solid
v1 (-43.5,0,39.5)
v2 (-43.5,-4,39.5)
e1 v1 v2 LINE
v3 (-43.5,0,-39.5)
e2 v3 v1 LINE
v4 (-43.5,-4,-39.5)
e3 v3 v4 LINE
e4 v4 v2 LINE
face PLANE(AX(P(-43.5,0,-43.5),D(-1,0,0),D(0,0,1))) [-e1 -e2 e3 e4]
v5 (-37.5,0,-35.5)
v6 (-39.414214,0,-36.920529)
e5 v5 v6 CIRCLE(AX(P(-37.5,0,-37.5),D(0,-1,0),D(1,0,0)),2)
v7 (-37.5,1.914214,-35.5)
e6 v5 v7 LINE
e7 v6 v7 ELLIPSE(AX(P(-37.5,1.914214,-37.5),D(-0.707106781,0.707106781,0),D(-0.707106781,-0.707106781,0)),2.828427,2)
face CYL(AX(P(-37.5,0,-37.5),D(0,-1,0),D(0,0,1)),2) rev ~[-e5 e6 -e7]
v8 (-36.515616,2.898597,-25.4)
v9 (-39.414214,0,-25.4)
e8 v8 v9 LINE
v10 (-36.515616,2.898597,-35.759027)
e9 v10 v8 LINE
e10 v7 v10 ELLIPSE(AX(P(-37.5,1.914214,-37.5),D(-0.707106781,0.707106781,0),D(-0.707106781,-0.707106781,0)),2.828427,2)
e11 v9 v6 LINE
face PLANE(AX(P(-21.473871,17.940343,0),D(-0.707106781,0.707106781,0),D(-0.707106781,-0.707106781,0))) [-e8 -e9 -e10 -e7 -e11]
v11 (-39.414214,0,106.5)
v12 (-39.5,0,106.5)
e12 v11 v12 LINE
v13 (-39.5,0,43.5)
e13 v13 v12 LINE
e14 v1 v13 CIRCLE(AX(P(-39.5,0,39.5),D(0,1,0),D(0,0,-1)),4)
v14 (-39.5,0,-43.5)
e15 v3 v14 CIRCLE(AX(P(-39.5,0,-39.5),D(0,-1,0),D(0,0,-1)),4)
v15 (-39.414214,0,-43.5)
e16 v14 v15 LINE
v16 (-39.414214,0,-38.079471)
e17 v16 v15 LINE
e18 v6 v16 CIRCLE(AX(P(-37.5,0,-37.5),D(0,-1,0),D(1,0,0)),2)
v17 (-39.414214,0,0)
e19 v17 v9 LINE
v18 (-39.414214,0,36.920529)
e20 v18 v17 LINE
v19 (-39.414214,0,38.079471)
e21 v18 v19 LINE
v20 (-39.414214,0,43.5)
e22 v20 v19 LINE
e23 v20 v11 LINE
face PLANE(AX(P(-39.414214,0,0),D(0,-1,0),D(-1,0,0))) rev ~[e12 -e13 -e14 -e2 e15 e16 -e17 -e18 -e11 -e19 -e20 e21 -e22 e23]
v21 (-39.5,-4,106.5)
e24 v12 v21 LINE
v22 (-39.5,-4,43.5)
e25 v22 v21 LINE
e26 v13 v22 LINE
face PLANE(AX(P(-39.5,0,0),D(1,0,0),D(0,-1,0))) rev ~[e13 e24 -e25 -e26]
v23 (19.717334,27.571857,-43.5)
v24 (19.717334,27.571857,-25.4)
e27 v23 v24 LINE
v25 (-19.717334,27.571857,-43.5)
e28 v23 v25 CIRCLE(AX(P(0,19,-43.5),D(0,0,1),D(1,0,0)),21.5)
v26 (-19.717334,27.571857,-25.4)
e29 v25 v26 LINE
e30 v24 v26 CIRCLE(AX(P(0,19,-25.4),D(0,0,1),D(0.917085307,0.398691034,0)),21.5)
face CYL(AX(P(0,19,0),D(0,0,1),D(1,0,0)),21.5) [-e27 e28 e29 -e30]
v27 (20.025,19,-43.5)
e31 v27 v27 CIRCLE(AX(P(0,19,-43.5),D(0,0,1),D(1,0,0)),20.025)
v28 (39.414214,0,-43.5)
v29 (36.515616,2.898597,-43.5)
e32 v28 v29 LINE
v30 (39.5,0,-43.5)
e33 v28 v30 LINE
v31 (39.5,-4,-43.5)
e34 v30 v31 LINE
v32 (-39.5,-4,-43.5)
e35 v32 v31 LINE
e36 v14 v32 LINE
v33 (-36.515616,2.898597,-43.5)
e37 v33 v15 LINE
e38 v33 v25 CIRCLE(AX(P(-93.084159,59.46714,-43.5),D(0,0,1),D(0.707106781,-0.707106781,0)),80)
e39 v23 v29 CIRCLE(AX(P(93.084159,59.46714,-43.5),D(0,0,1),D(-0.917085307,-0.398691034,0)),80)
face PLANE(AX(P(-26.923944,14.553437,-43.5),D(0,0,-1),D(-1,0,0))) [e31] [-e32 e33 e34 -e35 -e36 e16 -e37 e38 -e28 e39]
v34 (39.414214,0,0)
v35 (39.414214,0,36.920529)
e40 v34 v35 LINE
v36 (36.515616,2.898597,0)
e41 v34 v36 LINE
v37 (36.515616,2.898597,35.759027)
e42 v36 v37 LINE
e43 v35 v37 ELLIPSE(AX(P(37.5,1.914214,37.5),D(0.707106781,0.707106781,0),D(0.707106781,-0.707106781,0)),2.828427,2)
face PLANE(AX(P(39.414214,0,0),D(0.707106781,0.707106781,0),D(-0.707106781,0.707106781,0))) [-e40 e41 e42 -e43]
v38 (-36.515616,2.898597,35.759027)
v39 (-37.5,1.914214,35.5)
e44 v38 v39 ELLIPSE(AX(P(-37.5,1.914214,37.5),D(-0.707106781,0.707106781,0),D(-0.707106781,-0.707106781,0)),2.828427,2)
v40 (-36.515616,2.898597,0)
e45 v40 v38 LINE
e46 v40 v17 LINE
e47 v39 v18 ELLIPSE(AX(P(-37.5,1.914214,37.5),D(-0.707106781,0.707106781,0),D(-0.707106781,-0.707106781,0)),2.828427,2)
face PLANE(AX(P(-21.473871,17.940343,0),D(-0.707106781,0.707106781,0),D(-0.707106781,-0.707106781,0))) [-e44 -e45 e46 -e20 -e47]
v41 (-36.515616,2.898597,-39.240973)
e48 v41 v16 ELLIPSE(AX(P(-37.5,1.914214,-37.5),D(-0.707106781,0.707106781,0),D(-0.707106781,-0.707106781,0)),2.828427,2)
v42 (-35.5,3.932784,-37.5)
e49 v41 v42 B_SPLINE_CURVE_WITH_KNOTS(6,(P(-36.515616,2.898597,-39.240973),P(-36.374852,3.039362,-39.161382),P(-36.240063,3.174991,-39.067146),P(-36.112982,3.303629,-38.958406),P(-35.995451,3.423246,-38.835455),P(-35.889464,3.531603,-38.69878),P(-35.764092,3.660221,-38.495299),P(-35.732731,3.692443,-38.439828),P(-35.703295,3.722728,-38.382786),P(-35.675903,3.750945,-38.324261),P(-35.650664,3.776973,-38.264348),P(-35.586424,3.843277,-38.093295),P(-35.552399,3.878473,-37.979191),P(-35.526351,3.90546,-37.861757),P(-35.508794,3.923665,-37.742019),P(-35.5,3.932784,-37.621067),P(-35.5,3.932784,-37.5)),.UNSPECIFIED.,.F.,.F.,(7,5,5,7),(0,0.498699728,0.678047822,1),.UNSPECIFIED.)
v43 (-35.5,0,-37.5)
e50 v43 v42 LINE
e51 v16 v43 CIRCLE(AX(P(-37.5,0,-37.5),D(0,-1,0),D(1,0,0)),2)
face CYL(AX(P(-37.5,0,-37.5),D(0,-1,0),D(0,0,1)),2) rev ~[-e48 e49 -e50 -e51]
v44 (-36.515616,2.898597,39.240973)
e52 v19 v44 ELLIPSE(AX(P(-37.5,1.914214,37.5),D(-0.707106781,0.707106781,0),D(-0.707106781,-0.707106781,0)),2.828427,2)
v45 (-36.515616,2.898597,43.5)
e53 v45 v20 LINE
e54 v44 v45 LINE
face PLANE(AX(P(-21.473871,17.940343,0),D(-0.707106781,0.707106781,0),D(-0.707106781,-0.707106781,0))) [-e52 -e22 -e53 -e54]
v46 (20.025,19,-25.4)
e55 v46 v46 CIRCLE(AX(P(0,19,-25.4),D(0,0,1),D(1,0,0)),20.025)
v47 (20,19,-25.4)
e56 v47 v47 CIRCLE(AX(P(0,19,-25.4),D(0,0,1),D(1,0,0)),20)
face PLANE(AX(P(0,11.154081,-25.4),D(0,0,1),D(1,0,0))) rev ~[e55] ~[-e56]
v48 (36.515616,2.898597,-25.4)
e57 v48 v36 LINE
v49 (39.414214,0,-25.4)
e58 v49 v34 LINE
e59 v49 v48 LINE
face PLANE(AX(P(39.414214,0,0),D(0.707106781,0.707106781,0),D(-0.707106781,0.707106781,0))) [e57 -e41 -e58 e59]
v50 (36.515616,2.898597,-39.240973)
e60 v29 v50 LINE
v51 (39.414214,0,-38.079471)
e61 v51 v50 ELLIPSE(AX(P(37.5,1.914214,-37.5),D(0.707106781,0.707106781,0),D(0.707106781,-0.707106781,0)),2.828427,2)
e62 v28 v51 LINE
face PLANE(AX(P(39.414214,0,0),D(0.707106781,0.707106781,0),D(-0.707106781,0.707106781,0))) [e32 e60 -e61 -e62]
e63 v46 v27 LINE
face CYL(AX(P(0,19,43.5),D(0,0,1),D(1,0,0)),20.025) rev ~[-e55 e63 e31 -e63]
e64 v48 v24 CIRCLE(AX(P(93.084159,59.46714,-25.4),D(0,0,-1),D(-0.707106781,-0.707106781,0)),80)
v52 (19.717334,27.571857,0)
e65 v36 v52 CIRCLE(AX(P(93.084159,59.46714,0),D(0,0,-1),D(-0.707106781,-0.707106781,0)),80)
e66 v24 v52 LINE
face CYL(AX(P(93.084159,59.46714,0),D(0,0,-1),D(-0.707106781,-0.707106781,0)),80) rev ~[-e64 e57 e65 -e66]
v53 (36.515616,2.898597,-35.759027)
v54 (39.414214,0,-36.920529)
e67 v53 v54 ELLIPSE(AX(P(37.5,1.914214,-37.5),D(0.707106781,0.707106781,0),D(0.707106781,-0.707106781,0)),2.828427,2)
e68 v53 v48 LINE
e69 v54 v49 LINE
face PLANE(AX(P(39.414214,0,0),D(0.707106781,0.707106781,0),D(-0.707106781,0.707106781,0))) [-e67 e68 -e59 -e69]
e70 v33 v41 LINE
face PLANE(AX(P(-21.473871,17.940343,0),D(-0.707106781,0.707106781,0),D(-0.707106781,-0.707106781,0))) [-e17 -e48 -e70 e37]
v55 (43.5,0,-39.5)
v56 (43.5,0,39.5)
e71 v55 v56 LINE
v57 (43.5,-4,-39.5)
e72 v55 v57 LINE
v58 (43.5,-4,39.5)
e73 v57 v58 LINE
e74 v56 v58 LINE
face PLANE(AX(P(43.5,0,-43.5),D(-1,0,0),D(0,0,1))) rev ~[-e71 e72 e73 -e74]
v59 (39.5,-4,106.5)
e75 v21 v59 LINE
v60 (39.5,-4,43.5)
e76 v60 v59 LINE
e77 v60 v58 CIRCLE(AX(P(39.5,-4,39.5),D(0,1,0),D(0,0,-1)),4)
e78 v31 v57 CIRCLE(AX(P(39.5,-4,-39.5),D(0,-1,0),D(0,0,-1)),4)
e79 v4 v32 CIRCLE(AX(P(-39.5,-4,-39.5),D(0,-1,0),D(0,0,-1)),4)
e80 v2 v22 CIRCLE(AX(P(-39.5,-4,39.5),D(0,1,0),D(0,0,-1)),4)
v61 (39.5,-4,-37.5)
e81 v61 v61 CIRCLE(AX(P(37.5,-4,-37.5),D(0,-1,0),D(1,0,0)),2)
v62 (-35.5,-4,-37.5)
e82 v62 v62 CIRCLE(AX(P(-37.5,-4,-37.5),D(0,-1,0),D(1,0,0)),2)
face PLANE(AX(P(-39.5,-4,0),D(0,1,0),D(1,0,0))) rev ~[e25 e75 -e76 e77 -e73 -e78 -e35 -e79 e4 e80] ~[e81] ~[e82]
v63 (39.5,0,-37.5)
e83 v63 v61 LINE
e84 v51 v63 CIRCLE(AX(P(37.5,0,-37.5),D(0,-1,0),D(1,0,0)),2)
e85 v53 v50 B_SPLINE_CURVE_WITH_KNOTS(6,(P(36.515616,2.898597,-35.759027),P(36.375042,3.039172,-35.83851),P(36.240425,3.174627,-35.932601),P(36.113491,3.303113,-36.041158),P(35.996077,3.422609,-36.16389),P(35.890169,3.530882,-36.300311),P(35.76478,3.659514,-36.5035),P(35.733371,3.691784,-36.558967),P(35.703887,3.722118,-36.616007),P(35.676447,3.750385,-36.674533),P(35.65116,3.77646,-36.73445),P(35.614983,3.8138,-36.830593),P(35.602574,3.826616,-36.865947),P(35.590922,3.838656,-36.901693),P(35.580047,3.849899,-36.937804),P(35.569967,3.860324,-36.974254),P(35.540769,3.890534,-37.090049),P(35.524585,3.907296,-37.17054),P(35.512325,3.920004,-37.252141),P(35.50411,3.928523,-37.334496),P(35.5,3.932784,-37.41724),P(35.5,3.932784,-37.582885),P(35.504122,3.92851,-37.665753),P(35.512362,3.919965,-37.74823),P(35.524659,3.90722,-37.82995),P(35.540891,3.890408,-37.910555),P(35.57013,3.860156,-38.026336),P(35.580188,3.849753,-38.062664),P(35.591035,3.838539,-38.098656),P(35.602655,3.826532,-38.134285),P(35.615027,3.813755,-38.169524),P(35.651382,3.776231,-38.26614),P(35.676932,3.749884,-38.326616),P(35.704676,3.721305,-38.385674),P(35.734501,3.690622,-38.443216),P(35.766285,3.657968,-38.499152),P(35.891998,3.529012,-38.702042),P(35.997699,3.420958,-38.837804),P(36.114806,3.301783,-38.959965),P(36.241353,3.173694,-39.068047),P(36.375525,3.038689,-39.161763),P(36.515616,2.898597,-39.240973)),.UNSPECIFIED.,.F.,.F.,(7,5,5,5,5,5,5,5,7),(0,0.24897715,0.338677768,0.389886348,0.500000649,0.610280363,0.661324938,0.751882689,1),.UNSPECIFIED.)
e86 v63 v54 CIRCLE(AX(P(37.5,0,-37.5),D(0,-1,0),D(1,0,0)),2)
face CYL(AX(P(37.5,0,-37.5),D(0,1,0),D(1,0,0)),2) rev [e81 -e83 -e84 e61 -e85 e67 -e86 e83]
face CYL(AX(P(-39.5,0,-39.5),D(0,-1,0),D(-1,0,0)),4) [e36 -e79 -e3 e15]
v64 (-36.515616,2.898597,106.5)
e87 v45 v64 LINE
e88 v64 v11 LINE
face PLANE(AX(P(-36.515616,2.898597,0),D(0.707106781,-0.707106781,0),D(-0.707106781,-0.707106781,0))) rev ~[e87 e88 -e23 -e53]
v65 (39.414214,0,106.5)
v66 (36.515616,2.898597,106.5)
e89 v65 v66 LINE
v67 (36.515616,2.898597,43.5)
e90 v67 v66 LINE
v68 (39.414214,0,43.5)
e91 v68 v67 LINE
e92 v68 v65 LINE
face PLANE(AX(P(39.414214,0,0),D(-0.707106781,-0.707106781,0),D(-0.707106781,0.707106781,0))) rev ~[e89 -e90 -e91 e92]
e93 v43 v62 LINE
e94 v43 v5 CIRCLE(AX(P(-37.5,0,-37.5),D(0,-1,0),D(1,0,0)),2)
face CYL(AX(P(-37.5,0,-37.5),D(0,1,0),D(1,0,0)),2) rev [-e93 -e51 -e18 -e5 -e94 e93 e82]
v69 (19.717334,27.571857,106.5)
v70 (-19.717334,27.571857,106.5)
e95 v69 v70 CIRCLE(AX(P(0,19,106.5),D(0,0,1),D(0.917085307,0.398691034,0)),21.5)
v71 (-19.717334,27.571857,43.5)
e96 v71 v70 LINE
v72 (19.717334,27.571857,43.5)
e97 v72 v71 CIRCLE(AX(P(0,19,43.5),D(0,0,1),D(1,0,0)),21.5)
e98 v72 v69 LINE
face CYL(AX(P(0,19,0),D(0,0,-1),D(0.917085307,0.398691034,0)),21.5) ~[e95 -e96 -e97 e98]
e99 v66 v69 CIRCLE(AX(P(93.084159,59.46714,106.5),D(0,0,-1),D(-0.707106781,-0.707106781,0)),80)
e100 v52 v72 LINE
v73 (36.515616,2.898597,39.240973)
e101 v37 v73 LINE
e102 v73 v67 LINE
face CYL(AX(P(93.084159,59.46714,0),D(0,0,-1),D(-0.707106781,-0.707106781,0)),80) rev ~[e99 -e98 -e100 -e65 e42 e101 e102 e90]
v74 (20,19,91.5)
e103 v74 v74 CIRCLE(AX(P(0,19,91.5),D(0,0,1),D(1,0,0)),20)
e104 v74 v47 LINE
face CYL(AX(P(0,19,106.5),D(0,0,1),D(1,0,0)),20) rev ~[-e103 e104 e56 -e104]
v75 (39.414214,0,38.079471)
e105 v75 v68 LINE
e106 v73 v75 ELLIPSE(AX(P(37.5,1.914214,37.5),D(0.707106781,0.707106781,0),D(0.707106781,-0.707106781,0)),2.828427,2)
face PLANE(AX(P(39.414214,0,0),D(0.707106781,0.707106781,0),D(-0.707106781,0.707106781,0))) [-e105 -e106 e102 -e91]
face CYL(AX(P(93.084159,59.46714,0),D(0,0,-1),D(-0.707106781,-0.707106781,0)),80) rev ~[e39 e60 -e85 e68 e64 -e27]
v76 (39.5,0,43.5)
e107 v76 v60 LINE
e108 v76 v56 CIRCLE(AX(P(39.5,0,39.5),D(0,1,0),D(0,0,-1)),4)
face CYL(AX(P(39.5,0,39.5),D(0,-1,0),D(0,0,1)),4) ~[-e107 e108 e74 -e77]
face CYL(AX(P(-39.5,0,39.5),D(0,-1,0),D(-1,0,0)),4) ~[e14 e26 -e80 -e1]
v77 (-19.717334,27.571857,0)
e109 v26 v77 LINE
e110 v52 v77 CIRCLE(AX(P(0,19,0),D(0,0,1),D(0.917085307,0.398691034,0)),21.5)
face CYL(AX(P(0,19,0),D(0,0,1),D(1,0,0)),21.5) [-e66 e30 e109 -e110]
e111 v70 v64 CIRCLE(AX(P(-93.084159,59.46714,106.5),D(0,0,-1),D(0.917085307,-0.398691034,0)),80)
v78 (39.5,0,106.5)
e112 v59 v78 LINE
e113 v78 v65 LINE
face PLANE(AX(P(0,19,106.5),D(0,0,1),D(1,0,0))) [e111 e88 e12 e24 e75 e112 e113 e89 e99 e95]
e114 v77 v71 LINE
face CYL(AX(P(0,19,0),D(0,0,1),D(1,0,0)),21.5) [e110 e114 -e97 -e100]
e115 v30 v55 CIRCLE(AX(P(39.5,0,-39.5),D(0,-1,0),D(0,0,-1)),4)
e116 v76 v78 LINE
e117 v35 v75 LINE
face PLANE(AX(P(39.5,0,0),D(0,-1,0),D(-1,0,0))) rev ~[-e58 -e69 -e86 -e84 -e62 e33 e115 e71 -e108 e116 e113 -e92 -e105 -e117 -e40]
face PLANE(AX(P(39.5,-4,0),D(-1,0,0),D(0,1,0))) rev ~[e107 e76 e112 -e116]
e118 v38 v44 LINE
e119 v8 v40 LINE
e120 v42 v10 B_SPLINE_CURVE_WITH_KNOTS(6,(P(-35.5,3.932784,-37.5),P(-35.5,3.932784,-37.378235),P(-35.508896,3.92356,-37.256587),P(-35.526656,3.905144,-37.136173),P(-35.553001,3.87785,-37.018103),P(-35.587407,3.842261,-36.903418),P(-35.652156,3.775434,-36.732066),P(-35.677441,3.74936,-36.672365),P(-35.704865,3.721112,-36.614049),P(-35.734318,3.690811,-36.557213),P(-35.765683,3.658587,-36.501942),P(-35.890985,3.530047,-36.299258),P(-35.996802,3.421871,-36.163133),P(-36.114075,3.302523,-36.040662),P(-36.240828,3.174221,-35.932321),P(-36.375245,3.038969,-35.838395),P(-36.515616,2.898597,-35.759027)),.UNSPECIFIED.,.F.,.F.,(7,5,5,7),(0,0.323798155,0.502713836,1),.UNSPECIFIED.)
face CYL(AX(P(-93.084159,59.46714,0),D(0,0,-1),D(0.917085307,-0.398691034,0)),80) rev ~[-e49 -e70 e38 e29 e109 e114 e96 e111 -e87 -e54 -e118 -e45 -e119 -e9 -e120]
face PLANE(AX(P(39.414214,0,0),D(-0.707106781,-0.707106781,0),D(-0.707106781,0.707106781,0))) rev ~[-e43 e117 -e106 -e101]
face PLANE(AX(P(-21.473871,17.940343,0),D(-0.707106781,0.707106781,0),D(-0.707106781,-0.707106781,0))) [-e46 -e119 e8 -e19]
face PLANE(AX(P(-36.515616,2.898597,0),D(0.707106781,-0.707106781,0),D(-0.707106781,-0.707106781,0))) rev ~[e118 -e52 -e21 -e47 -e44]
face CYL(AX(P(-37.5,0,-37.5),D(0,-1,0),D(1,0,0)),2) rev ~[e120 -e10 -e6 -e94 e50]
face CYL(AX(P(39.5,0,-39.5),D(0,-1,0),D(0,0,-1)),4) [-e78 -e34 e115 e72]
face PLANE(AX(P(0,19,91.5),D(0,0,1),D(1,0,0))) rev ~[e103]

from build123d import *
from build123d import SkipClean  # not in build123d's __all__

# Parameters (mm, degrees)
F0_W           = 87
F0_H           = 87
F0_R           = 2
F1_DEPTH       = 4
F2_R           = 4
F5_DEPTH       = 43.5
F6_T1_DEPTH    = 87
F7_R           = 20.025
F8_DEPTH       = 87.001
F9_R           = 2
F10_DEPTH      = 40.501
F11_R          = 20
F12_DEPTH      = 10
F15_DEPTH      = 106.5
F15_DEPTH_BACK = 25.4
F16_R          = 20
F17_DEPTH      = 150.0010001
F18_R          = 20
F19_DEPTH      = 15


# Not quite as in the source:
# - a fillet or chamfer that OpenCascade refuses, or shapes differently, is made with other operations: its cross-section is extruded or revolved along the edge and cut away or added
# - after a boolean that leaves OpenCascade's solid faulty, fix() repairs it


with BuildPart() as f1:
    # F0 (on Front) → F1 (new body)
    with BuildSketch(Plane.XZ):
        Rectangle(F0_W, F0_H)
        with Locations((-37.5, -37.5)):
            Circle(F0_R, mode=Mode.SUBTRACT)
        with Locations((37.5, -37.5)):
            Circle(F0_R, mode=Mode.SUBTRACT)
        with Locations((-37.5, 37.5)):
            Circle(F0_R, mode=Mode.SUBTRACT)
        with Locations((37.5, 37.5)):
            Circle(F0_R, mode=Mode.SUBTRACT)
    extrude(amount=F1_DEPTH)

    # F2
    f2_edges = [f1.edges().sort_by_distance(p)[0] for p in [
        (43.5, -2, 43.5),
        (-43.5, -2, 43.5),
        (43.5, -2, -43.5),
        (-43.5, -2, -43.5),
    ]]
    fillet(f2_edges, radius=F2_R)

    # F4 (on Top) → F5 (join, symmetric)
    with BuildSketch(Plane.XY):
        with BuildLine():
            ThreePointArc((-10.0623058987, 0), (-17.7800410903, 6.9119836686), (-21.3690774705, 16.6309225295))
            Line((-21.3690774705, 16.6309225295), (-38, 0))
            Line((-38, 0), (-10.0623058987, 0))
        make_face()
        with BuildLine():
            Line((-38, 0), (-21.3690774705, 16.6309225295))
            ThreePointArc((-21.3690774705, 16.6309225295), (-21.4314768317, 17.2848321331), (-21.4738707868, 17.9403427756))
            Line((-21.4738707868, 17.9403427756), (-39.4142135624, 0))
            Line((-39.4142135624, 0), (-38, 0))
        make_face()
        with BuildLine():
            ThreePointArc((-21.4738707868, 17.9403427756), (-21.4314768317, 17.2848321331), (-21.3690774705, 16.6309225295))
            ThreePointArc((-21.3690774705, 16.6309225295), (-17.7800410903, 6.9119836686), (-10.0623058987, 0))
            Line((-10.0623058987, 0), (10.0623058987, 0))
            ThreePointArc((10.0623058987, 0), (17.7800410903, 6.9119836686), (21.3690774705, 16.6309225295))
            ThreePointArc((21.3690774705, 16.6309225295), (21.4314768317, 17.2848321331), (21.4738707868, 17.9403427756))
            Line((21.4738707868, 17.9403427756), (19.9956189847, 19.4185945777))
            ThreePointArc((19.9956189847, 19.4185945777), (13.9933575036, 33.2893647786), (0, 39))
            ThreePointArc((0, 39), (-13.9933575036, 33.2893647786), (-19.9956189847, 19.4185945777))
            Line((-19.9956189847, 19.4185945777), (-21.4738707868, 17.9403427756))
        make_face()
        with BuildLine():
            ThreePointArc((21.5, 19), (-0.5299896624, 40.493466704), (-21.4738707868, 17.9403427756))
            Line((-21.4738707868, 17.9403427756), (-19.9956189847, 19.4185945777))
            ThreePointArc((-19.9956189847, 19.4185945777), (-13.9933575036, 33.2893647786), (0, 39))
            ThreePointArc((0, 39), (13.9933575036, 33.2893647786), (19.9956189847, 19.4185945777))
            Line((19.9956189847, 19.4185945777), (21.4738707868, 17.9403427756))
            ThreePointArc((21.4738707868, 17.9403427756), (21.493466704, 18.4700103376), (21.5, 19))
        make_face()
        with BuildLine():
            Line((10.0623058987, 0), (-10.0623058987, 0))
            ThreePointArc((-10.0623058987, 0), (0, -2.5), (10.0623058987, 0))
        make_face()
        with BuildLine():
            ThreePointArc((21.3690774705, 16.6309225295), (17.7800410903, 6.9119836686), (10.0623058987, 0))
            Line((10.0623058987, 0), (38, 0))
            Line((38, 0), (21.3690774705, 16.6309225295))
        make_face()
        with BuildLine():
            Line((39.4142135624, 0), (21.4738707868, 17.9403427756))
            ThreePointArc((21.4738707868, 17.9403427756), (21.4314768317, 17.2848321331), (21.3690774705, 16.6309225295))
            Line((21.3690774705, 16.6309225295), (38, 0))
            Line((38, 0), (39.4142135624, 0))
        make_face()
    extrude(amount=F5_DEPTH, both=True)

    # F6: fillet of radius 80 on 2 edges, made by hand

    # F6_s2 → F6_t1 (join)
    with BuildSketch(Plane.XY.offset(-43.5)):
        with BuildLine():
            ThreePointArc((-36.5156161223, 2.89859744), (-26.9555540815, 14.444838104), (-19.7173340913, 27.5718572276))
            ThreePointArc((-19.7173340913, 27.5718572276), (-21.1511313524, 22.857413967), (-21.4738707868, 17.9403427756))
            Line((-21.4738707868, 17.9403427756), (-36.5156161223, 2.89859744))
        make_face()
        with BuildLine():
            ThreePointArc((19.7173340913, 27.5718572276), (26.9555540815, 14.444838104), (36.5156161223, 2.89859744))
            Line((36.5156161223, 2.89859744), (21.4738707868, 17.9403427756))
            ThreePointArc((21.4738707868, 17.9403427756), (21.1511313524, 22.857413967), (19.7173340913, 27.5718572276))
        make_face()
    extrude(amount=F6_T1_DEPTH)

    # F7 (on face) → F8 (cut, through all)
    with BuildSketch(Plane.XY.offset(43.5)):
        with Locations((0, 19)):
            Circle(F7_R)
    extrude(amount=-F8_DEPTH, mode=Mode.SUBTRACT)

    # F9 (on Front) → F10 (cut, through all)
    with BuildSketch(Plane.XZ):
        with BuildLine():
            Line((-37.5, 35.5), (-37.5, 37.5))
            Line((-37.5, 37.5), (-35.5, 37.5))
            ThreePointArc((-35.5, 37.5), (-38.9142135624, 38.9142135624), (-37.5, 35.5))
        make_face()
        with BuildLine():
            Line((-35.5, 37.5), (-37.5, 37.5))
            Line((-37.5, 37.5), (-37.5, 35.5))
            ThreePointArc((-37.5, 35.5), (-36.0857864376, 36.0857864376), (-35.5, 37.5))
        make_face()
        with BuildLine():
            ThreePointArc((39.5, 37.5), (37.5, 39.5), (35.5, 37.5))
            ThreePointArc((35.5, 37.5), (37.5, 35.5), (39.5, 37.5))
        make_face()
        with BuildLine():
            ThreePointArc((-35.5, -37.5), (-36.0857864376, -36.0857864376), (-37.5, -35.5))
            ThreePointArc((-37.5, -35.5), (-38.9142135624, -38.9142135624), (-35.5, -37.5))
        make_face()
        with Locations((37.5, -37.5)):
            Circle(F9_R)
    with SkipClean():  # cleaning this boolean's faces spoils the solid; the shape is the same uncleaned
        extrude(amount=-F10_DEPTH, mode=Mode.SUBTRACT)

    # F14 (on Top) → F15 (join, two sides)
    with BuildSketch(Plane.XY) as f15_sk:
        with BuildLine():
            Line((-39.5, -4), (39.5, -4))
            Line((39.5, -4), (39.5, 0))
            Line((39.5, 0), (39.4142135624, 0))
            Line((39.4142135624, 0), (36.5156161223, 2.89859744))
            ThreePointArc((36.5156161223, 2.89859744), (26.9555540815, 14.444838104), (19.7173340913, 27.5718572276))
            ThreePointArc((19.7173340913, 27.5718572276), (0, 40.5), (-19.7173340913, 27.5718572276))
            ThreePointArc((-19.7173340913, 27.5718572276), (-26.9555540815, 14.444838104), (-36.5156161223, 2.89859744))
            Line((-36.5156161223, 2.89859744), (-39.4142135624, 0))
            Line((-39.4142135624, 0), (-39.5, 0))
            Line((-39.5, 0), (-39.5, -4))
        make_face()
    extrude(amount=F15_DEPTH)
    extrude(f15_sk.sketch, amount=-F15_DEPTH_BACK)

    add(f1.part.fix(), mode=Mode.REPLACE)

    # F16 (on face) → F17 (cut, through all)
    with BuildSketch(Plane.XY.offset(106.5)):
        with Locations((0, 19)):
            Circle(F16_R)
    extrude(amount=-F17_DEPTH, mode=Mode.SUBTRACT)

    # F18 (on face) → F19 (join)
    with BuildSketch(Plane.XY.offset(106.5)):
        with Locations((0, 19)):
            Circle(F18_R)
    extrude(amount=-F19_DEPTH)


with BuildPart() as f12:
    # F11 (on face) → F12 (new body)
    with BuildSketch(Plane(origin=(0, 0, -43.5), x_dir=(1, 0, 0), z_dir=(0, 0, -1))):
        with Locations((0, -19)):
            Circle(F11_R)
    extrude(amount=-F12_DEPTH)


solid = f1.part
